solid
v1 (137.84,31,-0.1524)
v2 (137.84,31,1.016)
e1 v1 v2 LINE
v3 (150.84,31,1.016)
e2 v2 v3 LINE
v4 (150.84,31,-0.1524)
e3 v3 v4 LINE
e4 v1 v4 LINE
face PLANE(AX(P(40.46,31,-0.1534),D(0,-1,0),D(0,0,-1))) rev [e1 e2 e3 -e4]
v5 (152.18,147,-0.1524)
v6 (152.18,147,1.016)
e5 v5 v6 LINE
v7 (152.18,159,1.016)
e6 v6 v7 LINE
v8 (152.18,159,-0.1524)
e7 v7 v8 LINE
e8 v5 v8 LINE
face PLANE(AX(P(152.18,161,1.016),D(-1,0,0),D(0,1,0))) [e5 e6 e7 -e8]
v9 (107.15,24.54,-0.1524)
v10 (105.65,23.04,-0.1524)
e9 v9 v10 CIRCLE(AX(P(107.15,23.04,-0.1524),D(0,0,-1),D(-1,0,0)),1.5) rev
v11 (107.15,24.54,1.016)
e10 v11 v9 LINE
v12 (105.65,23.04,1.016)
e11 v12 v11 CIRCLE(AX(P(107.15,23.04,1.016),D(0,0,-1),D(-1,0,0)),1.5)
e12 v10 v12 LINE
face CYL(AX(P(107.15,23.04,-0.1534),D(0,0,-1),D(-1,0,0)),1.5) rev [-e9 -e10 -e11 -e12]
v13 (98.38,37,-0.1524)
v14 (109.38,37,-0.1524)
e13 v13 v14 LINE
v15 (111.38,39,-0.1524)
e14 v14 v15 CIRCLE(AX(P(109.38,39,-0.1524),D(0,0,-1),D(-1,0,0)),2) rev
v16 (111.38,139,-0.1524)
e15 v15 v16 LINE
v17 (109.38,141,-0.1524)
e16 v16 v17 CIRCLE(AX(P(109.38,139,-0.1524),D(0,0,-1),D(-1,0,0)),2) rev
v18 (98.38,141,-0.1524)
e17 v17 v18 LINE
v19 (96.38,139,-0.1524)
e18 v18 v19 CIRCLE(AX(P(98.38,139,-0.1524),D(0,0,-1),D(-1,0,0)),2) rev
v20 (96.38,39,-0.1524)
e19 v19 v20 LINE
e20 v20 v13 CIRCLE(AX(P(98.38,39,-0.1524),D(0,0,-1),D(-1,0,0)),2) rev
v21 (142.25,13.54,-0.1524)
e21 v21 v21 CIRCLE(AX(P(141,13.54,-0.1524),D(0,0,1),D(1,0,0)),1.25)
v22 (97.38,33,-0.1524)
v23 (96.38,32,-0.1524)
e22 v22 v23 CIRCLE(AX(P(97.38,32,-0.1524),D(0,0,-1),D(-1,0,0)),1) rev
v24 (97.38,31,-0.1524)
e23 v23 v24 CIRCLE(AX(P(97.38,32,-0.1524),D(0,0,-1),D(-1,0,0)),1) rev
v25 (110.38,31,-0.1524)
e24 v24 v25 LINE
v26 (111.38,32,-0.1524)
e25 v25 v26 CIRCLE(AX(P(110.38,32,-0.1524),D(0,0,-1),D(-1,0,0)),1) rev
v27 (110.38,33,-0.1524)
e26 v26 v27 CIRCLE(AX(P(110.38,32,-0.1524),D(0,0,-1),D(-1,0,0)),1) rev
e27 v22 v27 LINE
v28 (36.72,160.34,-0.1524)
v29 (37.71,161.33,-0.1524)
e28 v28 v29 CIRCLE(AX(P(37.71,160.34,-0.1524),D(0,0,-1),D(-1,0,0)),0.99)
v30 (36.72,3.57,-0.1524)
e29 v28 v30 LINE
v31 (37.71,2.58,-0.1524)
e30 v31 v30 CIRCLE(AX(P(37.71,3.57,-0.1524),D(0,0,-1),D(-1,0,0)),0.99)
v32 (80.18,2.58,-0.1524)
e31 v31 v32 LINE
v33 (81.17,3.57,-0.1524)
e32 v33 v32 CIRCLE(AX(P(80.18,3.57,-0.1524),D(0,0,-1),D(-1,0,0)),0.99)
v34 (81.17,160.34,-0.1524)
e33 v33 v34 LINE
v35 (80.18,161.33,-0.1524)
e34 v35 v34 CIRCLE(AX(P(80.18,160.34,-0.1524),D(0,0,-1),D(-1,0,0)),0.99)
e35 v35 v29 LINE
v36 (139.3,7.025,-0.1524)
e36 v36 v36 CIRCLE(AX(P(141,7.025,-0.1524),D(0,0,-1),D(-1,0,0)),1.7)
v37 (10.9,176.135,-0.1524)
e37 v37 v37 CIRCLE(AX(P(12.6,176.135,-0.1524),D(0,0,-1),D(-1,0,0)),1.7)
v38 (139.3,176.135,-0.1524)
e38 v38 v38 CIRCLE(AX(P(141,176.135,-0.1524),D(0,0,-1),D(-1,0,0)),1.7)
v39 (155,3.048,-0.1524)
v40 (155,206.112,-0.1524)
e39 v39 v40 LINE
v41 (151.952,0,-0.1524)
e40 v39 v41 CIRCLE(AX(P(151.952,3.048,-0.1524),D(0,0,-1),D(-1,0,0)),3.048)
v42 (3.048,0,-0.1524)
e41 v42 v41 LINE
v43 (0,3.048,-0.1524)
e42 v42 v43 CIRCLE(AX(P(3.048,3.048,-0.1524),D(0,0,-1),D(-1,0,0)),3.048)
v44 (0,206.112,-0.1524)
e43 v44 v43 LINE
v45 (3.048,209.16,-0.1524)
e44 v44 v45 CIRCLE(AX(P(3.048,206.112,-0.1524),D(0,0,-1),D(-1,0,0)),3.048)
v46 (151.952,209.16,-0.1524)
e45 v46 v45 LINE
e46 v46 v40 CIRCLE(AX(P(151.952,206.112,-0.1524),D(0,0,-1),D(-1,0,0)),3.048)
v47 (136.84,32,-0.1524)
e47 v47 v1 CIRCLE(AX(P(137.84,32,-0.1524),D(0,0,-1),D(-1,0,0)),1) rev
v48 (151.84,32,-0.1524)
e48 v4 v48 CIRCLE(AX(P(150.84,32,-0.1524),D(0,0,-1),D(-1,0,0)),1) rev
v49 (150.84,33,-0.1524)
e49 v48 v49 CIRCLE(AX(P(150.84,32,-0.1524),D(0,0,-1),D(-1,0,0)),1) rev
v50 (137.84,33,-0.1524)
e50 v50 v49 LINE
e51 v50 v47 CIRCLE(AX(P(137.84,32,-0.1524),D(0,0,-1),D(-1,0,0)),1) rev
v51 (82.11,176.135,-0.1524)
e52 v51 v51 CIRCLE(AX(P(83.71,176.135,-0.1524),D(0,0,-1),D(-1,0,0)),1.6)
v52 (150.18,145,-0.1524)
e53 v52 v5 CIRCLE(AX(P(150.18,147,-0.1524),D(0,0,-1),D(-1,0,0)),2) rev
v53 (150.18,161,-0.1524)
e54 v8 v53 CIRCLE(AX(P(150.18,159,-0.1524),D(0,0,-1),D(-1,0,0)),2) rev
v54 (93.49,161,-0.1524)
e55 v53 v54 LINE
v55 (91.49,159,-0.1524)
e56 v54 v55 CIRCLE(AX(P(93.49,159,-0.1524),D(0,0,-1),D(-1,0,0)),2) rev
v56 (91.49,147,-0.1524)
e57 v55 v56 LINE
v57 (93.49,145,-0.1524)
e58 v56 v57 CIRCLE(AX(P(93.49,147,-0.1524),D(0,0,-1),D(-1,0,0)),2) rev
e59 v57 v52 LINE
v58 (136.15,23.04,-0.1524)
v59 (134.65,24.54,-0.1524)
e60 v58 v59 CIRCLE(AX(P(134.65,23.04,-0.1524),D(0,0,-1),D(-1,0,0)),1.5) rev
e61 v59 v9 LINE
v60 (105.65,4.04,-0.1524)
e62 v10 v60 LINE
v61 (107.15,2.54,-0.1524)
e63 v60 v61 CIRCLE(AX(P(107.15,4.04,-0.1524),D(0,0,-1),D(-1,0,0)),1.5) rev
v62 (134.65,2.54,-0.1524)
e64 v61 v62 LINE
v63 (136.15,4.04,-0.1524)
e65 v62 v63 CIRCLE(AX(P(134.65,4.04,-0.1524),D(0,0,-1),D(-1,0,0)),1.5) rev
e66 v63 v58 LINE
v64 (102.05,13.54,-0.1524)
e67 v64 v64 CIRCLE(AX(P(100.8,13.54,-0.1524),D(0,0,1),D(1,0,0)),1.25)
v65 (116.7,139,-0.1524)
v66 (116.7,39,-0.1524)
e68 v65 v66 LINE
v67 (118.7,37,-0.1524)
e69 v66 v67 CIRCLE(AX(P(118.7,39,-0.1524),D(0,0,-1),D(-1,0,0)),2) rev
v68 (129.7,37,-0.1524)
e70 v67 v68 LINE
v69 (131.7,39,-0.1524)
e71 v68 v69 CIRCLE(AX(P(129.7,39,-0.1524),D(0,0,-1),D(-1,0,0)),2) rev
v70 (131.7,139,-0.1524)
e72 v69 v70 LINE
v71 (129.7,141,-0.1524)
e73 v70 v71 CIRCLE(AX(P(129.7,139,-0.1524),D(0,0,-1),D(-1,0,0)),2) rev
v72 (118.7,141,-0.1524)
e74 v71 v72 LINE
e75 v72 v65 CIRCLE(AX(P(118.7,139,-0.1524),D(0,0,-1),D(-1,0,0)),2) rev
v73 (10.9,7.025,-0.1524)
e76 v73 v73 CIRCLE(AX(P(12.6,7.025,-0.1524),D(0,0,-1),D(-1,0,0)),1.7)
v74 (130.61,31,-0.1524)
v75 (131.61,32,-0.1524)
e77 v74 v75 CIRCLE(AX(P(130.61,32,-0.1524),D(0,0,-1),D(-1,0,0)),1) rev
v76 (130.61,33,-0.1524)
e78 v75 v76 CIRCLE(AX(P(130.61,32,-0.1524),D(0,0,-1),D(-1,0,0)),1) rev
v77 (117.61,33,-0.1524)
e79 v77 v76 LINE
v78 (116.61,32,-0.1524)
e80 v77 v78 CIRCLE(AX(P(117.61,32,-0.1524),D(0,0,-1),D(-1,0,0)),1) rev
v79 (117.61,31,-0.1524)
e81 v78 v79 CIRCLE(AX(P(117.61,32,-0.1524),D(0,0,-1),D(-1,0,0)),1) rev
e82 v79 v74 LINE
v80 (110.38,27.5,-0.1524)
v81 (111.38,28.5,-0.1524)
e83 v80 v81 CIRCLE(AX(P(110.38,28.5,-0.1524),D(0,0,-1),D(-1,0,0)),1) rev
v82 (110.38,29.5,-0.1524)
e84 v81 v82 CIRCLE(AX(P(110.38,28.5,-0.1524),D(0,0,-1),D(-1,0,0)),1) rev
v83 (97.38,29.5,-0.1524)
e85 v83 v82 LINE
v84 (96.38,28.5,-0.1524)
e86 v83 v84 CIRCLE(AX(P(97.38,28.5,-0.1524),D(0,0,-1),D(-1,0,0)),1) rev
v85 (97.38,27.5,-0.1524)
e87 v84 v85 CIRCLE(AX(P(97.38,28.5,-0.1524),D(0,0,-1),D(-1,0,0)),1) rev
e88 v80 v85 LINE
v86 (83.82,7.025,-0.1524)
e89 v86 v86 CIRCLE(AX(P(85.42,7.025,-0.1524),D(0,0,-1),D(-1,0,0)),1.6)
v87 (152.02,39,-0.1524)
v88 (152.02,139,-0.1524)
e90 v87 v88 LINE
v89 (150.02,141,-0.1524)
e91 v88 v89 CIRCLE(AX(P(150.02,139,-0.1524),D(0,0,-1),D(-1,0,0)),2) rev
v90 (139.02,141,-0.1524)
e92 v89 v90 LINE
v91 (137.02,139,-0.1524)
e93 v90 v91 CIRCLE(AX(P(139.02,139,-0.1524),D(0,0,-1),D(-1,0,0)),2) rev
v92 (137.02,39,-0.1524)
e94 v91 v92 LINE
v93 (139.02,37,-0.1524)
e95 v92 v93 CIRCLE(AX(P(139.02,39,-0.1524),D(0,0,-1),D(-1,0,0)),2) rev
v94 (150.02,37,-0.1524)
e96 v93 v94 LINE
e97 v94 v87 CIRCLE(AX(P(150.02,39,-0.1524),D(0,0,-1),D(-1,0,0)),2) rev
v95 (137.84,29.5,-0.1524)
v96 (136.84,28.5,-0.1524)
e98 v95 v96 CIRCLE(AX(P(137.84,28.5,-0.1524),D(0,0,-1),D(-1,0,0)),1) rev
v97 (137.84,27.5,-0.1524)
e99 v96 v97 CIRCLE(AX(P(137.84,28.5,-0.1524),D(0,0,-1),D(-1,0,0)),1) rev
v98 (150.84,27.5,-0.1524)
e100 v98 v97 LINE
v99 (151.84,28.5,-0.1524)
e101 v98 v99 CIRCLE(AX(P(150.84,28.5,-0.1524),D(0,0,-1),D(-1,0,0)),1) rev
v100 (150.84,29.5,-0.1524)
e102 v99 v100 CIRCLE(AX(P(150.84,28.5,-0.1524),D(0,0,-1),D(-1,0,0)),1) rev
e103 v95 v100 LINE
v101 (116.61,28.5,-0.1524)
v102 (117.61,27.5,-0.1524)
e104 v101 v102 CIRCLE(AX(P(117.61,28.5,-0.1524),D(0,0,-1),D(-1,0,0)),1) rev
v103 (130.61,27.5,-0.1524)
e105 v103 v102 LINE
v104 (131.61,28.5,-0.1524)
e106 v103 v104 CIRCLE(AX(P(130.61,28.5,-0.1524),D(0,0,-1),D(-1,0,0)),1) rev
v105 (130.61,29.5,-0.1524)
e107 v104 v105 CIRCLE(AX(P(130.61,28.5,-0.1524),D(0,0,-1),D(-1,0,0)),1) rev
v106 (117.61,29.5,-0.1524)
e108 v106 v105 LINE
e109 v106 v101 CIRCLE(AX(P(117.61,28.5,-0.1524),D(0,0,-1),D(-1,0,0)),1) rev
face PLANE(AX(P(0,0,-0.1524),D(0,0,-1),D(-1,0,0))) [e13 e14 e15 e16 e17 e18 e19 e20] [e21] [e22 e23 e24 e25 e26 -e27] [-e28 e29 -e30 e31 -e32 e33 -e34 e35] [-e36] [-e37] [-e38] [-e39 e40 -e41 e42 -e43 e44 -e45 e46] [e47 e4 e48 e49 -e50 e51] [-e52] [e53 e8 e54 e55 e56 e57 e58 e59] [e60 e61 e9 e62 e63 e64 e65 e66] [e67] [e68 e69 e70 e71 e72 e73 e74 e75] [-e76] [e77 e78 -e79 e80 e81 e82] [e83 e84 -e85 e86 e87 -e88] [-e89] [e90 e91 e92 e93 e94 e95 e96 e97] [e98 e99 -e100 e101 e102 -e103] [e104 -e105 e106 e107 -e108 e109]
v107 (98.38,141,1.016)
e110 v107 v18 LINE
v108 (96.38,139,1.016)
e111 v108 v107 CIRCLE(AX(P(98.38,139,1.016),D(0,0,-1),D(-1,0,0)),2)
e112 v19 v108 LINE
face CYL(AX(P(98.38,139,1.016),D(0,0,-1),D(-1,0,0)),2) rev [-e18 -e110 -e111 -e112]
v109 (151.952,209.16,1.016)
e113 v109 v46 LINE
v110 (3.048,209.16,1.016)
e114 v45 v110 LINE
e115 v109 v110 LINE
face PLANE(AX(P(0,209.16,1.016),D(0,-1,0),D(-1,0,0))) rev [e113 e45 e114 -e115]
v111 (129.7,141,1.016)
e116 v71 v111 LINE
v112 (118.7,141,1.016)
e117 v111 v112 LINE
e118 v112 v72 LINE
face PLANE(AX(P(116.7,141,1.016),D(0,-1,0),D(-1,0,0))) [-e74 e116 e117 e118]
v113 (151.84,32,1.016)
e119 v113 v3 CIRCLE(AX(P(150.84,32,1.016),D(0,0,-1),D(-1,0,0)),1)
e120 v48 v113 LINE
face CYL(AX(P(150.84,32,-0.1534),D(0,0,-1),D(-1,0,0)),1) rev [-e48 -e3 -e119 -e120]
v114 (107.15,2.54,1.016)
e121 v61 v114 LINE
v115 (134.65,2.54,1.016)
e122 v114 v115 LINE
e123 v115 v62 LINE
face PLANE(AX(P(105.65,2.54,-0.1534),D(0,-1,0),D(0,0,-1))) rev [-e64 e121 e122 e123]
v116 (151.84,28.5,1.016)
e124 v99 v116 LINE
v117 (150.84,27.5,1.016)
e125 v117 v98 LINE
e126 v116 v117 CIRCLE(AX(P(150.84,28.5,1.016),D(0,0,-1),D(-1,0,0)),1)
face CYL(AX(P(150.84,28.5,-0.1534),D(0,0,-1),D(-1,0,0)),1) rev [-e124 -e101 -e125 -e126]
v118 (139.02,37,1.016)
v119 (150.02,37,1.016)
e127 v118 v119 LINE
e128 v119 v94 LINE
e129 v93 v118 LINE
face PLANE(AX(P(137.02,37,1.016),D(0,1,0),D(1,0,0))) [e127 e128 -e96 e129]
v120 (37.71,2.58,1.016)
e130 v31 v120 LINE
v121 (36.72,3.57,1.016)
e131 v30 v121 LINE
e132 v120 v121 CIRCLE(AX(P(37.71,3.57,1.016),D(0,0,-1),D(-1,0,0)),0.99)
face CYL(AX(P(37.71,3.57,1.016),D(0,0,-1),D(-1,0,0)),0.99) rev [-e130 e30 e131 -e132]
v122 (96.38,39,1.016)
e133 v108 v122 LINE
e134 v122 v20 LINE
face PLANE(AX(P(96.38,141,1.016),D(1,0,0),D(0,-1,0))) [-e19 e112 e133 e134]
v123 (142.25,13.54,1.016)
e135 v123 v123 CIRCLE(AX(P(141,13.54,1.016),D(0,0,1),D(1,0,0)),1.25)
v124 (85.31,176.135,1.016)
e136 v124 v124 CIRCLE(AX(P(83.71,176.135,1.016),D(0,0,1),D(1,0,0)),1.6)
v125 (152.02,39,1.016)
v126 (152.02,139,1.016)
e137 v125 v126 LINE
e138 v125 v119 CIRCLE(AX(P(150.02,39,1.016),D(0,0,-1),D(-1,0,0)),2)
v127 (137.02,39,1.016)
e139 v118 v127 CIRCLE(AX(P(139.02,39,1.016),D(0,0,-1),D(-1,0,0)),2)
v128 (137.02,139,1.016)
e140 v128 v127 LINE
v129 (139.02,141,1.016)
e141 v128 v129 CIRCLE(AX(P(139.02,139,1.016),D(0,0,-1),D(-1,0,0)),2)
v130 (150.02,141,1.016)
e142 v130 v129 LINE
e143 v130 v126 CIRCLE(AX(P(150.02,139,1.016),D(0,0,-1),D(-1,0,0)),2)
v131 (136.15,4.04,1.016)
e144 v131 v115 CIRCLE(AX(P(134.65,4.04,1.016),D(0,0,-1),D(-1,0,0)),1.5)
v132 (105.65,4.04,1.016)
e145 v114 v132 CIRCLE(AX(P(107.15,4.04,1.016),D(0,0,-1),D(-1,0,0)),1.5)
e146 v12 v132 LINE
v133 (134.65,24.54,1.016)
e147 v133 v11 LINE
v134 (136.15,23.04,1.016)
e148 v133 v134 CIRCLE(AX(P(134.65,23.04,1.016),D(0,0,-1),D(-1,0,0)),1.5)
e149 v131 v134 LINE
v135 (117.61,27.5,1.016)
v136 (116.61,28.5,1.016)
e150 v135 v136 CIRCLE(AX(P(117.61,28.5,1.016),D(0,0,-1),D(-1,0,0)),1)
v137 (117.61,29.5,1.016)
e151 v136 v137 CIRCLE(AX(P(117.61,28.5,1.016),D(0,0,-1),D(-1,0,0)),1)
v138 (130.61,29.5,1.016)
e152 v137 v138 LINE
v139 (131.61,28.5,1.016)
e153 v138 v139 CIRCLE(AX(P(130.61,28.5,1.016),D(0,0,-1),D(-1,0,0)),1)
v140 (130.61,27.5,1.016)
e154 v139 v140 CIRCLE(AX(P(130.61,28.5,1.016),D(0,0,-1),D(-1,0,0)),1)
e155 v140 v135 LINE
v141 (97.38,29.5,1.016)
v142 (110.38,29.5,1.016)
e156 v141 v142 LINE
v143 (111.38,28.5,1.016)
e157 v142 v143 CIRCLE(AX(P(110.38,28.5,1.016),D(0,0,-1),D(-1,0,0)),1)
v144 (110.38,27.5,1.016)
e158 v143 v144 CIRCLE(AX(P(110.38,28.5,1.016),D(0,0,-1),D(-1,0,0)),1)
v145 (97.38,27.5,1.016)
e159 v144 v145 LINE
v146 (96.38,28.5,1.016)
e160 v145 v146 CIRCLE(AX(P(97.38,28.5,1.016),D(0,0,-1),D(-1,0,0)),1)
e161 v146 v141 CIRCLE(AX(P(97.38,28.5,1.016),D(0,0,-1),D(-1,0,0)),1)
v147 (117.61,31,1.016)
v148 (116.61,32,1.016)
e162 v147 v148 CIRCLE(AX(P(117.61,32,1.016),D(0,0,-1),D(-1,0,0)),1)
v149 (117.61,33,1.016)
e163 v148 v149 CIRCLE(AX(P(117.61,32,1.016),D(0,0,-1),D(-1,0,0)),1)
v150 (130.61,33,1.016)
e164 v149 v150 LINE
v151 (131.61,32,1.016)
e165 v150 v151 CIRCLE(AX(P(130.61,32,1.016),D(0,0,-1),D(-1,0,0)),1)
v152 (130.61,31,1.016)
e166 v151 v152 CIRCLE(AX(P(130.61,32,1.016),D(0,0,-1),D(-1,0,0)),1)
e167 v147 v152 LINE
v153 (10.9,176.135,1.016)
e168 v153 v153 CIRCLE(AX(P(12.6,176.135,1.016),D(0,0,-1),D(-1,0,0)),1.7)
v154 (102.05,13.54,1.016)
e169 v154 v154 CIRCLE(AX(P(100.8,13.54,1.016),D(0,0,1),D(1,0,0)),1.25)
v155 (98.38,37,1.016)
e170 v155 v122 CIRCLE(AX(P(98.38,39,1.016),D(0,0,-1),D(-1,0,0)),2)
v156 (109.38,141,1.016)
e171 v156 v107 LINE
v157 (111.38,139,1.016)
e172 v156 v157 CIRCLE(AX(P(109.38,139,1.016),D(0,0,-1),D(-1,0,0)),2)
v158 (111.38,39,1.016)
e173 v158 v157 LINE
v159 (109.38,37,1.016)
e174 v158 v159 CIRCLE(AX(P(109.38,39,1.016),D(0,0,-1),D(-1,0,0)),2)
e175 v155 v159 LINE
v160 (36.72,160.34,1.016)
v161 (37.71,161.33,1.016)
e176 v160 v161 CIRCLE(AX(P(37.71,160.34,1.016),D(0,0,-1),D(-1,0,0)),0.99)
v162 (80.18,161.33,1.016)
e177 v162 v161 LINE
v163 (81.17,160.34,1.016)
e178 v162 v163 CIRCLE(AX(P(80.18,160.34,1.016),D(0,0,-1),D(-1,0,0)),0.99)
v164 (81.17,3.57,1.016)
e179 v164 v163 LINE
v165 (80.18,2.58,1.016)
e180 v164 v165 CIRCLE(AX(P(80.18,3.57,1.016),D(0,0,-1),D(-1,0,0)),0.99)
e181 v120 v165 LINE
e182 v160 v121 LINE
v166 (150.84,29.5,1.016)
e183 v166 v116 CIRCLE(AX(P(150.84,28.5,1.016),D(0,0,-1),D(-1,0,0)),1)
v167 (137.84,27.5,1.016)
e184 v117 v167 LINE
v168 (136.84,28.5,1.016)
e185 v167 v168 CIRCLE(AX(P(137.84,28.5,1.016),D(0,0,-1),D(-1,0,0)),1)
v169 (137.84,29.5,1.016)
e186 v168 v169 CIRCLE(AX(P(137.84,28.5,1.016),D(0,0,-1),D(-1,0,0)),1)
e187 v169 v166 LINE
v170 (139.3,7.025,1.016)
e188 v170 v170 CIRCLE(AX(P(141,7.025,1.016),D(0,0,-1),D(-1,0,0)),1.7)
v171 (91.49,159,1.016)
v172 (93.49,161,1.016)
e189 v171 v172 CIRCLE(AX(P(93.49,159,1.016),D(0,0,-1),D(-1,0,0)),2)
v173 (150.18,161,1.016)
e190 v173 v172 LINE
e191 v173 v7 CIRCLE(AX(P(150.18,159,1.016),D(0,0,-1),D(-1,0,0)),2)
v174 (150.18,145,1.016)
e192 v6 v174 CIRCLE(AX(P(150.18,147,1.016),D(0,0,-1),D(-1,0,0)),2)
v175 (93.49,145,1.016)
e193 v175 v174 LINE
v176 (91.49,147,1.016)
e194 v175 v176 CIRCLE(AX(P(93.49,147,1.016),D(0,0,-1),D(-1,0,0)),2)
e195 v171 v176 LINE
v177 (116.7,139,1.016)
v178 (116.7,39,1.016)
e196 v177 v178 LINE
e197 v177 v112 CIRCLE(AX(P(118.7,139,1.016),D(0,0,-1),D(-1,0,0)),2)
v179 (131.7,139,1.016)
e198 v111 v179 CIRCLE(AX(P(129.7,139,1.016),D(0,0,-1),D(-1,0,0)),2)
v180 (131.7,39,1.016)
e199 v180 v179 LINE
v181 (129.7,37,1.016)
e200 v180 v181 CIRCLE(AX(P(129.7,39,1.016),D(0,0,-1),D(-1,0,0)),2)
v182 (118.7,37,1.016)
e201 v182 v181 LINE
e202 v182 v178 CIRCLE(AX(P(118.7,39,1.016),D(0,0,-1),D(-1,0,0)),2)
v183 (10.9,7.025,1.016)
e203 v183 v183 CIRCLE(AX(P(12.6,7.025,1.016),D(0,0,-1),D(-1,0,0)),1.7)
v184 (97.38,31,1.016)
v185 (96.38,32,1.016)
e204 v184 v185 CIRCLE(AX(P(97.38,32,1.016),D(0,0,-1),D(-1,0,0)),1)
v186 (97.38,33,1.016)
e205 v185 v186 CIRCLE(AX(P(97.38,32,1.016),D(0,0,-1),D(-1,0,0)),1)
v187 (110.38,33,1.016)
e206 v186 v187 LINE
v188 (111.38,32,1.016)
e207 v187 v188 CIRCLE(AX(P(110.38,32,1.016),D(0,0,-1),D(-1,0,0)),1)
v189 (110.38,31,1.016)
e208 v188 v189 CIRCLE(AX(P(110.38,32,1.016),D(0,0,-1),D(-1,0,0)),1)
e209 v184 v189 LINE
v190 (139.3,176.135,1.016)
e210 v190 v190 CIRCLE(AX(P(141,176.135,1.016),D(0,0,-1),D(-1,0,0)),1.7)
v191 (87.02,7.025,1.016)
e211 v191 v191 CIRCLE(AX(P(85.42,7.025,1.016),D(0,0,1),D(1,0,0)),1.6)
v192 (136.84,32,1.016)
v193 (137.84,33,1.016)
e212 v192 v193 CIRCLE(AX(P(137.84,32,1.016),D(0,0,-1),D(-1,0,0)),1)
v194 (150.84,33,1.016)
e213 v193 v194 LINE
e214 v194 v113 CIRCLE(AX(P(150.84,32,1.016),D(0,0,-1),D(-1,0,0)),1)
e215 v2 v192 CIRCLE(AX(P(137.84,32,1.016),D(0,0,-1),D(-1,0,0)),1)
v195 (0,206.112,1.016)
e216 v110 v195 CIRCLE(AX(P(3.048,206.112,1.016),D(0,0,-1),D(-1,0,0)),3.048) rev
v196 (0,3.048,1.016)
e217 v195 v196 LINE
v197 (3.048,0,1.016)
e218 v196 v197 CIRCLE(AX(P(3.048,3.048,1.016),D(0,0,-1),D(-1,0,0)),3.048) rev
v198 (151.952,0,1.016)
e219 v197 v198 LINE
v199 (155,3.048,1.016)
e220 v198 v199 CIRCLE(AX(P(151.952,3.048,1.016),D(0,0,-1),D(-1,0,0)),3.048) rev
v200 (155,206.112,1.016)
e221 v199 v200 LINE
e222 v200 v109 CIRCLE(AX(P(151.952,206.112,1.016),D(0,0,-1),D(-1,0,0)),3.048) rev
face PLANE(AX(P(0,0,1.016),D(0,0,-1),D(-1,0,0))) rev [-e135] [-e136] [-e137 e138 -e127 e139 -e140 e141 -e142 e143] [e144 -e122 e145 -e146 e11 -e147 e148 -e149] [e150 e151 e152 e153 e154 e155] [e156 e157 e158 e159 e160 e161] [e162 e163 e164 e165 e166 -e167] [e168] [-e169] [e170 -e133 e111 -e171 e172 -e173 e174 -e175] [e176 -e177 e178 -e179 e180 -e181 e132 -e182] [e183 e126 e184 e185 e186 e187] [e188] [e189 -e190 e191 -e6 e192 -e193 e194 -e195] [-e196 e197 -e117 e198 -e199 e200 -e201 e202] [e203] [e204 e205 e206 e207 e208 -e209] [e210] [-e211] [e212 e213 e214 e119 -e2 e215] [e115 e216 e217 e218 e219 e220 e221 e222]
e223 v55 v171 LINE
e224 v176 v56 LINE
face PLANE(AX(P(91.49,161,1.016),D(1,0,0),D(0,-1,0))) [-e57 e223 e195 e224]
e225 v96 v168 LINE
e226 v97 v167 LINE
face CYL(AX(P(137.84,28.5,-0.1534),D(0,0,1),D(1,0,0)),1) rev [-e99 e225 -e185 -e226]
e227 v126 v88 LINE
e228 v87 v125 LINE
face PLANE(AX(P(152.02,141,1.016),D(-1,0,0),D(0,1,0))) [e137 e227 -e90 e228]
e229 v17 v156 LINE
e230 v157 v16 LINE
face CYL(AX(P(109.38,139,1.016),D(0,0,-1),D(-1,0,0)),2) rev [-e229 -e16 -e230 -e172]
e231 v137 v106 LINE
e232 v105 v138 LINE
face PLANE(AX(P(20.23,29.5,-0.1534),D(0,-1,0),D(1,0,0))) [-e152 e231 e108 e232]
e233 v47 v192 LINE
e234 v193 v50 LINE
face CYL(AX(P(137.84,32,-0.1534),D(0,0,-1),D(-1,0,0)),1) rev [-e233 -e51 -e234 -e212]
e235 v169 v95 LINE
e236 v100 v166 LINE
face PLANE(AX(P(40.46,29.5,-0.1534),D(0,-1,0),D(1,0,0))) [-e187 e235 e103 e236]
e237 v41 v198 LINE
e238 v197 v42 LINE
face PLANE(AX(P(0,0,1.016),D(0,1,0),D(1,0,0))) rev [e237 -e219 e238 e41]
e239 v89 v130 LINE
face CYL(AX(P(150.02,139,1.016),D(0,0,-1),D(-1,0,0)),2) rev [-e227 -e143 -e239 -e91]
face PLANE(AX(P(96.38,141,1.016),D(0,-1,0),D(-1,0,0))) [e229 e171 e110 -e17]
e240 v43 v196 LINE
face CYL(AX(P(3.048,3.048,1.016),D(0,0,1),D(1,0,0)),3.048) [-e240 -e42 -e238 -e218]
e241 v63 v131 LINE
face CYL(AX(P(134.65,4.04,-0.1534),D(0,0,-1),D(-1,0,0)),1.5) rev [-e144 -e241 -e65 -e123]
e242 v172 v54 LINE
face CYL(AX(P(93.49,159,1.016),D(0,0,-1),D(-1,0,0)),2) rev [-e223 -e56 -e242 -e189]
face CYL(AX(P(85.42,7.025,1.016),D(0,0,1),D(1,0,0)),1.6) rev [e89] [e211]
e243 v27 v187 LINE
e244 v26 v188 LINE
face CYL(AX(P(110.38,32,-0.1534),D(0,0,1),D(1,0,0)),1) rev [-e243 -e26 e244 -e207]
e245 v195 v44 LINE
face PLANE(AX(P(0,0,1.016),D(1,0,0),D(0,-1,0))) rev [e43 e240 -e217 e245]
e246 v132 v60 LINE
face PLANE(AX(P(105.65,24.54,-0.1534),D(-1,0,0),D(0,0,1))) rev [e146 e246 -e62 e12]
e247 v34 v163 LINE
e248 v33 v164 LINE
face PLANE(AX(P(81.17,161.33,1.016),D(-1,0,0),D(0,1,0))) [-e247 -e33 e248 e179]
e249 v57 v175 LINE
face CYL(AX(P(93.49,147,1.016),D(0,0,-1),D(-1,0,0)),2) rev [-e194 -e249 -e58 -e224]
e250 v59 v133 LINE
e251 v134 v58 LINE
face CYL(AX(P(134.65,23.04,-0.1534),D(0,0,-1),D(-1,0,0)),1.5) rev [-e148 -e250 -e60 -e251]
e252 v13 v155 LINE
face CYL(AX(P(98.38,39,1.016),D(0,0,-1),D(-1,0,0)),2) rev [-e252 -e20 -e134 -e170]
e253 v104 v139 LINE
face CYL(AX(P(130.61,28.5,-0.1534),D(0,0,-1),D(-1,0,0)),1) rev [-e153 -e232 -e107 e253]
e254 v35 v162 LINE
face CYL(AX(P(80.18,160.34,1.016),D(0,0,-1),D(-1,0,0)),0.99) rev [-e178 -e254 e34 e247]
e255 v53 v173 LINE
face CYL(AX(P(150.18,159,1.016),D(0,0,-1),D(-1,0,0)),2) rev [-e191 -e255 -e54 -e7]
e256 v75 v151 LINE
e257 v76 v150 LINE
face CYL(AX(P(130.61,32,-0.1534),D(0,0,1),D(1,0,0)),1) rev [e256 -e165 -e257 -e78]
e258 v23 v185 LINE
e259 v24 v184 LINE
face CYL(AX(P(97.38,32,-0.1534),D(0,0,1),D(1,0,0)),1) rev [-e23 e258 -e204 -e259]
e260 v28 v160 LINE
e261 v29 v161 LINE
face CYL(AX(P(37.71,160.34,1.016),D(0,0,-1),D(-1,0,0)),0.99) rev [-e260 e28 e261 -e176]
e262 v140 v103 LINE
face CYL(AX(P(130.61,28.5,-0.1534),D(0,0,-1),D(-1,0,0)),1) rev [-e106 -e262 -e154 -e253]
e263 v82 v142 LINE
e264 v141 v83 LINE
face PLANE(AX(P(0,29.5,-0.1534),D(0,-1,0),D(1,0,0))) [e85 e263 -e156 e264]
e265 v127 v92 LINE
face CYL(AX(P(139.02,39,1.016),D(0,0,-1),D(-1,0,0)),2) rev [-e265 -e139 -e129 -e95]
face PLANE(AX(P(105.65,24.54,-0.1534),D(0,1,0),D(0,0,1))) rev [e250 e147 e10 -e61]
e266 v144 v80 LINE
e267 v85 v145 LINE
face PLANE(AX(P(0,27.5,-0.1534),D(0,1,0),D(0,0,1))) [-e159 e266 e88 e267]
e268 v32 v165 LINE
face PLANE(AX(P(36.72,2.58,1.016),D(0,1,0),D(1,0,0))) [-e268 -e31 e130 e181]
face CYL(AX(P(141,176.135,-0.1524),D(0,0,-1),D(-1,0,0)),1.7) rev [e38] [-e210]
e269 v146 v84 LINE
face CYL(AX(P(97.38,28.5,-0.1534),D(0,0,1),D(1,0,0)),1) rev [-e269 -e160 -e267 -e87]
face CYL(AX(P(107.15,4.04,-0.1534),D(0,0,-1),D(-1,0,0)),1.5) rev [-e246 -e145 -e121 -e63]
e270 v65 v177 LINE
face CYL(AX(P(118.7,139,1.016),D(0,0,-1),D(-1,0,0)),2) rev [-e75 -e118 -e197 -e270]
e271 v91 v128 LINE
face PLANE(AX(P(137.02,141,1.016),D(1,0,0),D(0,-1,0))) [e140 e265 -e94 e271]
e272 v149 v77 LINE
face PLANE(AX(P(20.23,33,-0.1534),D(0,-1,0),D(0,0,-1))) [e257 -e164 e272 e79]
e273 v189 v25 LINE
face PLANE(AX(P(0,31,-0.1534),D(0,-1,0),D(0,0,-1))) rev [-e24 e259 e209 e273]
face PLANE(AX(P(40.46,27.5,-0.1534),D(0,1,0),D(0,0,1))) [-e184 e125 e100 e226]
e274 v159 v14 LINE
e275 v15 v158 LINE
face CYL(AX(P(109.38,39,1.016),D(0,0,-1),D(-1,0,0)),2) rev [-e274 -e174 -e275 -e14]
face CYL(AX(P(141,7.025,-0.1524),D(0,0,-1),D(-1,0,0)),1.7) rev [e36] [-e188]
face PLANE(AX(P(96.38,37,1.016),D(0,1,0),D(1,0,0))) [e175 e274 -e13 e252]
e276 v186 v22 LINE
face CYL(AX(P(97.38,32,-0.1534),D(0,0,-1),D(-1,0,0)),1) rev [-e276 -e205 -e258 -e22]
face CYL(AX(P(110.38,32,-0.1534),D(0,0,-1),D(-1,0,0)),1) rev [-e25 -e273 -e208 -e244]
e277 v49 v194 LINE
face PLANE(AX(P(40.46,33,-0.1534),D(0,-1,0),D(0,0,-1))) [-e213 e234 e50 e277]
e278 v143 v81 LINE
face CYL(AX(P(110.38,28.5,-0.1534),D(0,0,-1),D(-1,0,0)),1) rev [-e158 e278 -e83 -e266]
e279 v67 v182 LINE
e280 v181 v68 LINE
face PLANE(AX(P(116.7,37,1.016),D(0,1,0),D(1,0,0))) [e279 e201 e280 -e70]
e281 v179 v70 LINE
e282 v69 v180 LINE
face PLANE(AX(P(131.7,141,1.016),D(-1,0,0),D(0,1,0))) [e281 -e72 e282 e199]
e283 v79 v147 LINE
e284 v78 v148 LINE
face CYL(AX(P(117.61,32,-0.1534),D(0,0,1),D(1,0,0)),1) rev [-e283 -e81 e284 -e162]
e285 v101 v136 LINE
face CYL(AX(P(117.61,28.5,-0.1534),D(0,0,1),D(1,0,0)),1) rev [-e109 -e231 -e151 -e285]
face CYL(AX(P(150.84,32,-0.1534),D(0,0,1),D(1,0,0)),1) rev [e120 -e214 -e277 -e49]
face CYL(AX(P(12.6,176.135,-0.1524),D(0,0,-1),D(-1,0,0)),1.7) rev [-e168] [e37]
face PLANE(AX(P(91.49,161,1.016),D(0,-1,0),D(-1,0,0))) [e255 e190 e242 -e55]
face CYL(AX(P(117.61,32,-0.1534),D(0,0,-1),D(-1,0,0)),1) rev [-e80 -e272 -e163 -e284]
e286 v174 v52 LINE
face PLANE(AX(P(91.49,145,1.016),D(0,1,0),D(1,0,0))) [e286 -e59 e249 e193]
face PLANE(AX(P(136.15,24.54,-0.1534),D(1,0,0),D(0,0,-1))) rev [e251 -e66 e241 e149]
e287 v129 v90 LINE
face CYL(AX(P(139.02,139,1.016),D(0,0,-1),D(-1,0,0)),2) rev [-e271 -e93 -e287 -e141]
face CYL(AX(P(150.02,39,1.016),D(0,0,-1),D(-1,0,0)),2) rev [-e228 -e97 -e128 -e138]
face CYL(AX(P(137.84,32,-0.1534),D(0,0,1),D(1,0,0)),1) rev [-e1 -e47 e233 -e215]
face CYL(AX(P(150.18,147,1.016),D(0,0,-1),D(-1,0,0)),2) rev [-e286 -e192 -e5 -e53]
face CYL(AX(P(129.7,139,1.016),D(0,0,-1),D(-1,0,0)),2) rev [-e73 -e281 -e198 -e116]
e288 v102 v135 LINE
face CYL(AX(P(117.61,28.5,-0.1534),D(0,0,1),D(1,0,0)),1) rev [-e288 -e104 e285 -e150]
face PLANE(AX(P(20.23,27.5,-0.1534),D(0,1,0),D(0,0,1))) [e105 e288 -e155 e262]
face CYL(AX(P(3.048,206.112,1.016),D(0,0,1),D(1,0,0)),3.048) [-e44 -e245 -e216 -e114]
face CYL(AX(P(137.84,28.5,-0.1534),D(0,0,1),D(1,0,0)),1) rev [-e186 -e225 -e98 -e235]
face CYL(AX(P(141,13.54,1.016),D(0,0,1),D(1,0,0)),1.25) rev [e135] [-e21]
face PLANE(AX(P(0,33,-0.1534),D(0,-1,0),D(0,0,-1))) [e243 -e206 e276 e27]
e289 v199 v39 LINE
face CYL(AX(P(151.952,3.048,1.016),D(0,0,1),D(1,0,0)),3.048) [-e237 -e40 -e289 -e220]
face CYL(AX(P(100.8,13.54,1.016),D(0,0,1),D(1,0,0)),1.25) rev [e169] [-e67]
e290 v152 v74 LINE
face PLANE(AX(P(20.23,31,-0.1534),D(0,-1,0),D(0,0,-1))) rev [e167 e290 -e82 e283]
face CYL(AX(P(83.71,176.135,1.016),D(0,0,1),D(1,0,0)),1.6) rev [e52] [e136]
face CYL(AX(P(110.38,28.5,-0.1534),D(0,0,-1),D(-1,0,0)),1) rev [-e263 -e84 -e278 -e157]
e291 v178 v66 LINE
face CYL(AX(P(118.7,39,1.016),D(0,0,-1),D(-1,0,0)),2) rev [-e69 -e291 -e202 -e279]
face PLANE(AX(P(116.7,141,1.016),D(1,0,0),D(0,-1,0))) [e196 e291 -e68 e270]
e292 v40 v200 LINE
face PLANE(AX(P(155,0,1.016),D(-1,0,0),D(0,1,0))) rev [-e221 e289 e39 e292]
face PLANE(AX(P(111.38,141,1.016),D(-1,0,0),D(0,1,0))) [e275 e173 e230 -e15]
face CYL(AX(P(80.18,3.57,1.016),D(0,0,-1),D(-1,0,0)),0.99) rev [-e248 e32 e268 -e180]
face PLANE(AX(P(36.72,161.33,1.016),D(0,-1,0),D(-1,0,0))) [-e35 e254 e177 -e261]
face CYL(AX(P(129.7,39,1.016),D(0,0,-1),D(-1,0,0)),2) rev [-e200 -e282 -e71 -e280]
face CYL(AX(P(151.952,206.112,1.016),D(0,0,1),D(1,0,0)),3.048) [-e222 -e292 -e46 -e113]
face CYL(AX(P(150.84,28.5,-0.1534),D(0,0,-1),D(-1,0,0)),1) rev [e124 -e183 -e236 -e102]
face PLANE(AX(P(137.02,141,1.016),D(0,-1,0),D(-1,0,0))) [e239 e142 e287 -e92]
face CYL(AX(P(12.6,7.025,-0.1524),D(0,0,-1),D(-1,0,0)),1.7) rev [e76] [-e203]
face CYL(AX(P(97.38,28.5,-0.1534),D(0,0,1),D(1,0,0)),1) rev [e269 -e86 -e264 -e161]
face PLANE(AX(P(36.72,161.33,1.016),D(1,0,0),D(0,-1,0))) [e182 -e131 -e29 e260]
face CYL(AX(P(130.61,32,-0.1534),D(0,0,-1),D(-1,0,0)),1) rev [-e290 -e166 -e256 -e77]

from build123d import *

# Parameters (mm, degrees)
SKETCH1_W                          = 155
SKETCH1_H                          = 209.16
BACKPLATE_DEPTH                    = 1.016
IO_SHIELD_CUTOUT_REACH             = 262.334
SKETCH2_W                          = 44.45
SKETCH2_H                          = 158.75
FILLET1_R                          = 0.99
EXPANSION_CARD_CUTOUT_REACH        = 262.334
SKETCH5_W                          = 15
SKETCH5_H                          = 104
SKETCH5_W_2                        = 60.69
SKETCH5_H_2                        = 16
CONVERT_SOLID2_START               = -0.1524
CONVERT_SOLID2_OUTLINE_W           = 155
CONVERT_SOLID2_OUTLINE_H           = 209.16
CONVERT_SOLID2_OUTLINE_W_2         = 15
CONVERT_SOLID2_OUTLINE_H_2         = 104
CONVERT_SOLID2_OUTLINE_W_3         = 60.69
CONVERT_SOLID2_OUTLINE_H_3         = 16
CONVERT_SOLID2_DEPTH               = 0.1524
FILLET2_R                          = 3.048
EXPANSION_CARD_TABS_REACH          = 262.335
SKETCH33_W                         = 15
SKETCH33_H                         = 2
LPATTERN1_COUNT                    = 3
LPATTERN1_PITCH                    = 20.23
M3_CLEARANCE_HOLE_FRAME_MOUNTING_D = 3.4
PANEL_MOUNT_CABLE_CUTOUT_REACH     = 262.335
SKETCH42_W                         = 30.5
SKETCH42_H                         = 22
FILLET3_R                          = 1.5
TAP_DRILL_FOR_M3X0_5_TAP1_D        = 2.5
FILLET4_R                          = 2
FILLET5_R                          = 1
SPINE_MOUNTING_HOLES_D             = 3.2
SPINE_MOUNTING_HOLES_DEPTH         = 5
SPINE_MOUNTING_HOLES_TIP           = 0.96137699


# Read off the part's stored shape, not the designer's step: Convert-Solid2
with BuildPart() as part:
    # Sketch1 → backplate (new body)
    with BuildSketch(Plane.XY):
        with Locations((77.5, 104.58)):
            Rectangle(SKETCH1_W, SKETCH1_H)
    extrude(amount=BACKPLATE_DEPTH)

    # Sketch2 → io_shield_cutout (cut, up to next)
    with BuildSketch(Plane.XY.offset(1.016), mode=Mode.PRIVATE) as io_shield_cutout_sk1:
        with Locations((58.945, 81.955)):
            Rectangle(SKETCH2_W, SKETCH2_H)
    io_shield_cutout_tool1 = extrude(io_shield_cutout_sk1.sketch, amount=-IO_SHIELD_CUTOUT_REACH, mode=Mode.PRIVATE) & part.part
    add(io_shield_cutout_tool1.solids().sort_by_distance((58.945, 81.955, 1.016))[0], mode=Mode.SUBTRACT)

    # Fillet1
    fillet1_edges = [part.edges().sort_by_distance(p)[0] for p in [
        (36.72, 2.58, 0.508),
        (36.72, 161.33, 0.508),
        (81.17, 161.33, 0.508),
        (81.17, 2.58, 0.508),
    ]]
    fillet(fillet1_edges, radius=FILLET1_R)

    # Sketch5 → expansion-card-cutout (cut, up to next)
    with BuildSketch(Plane.XY.offset(1.016), mode=Mode.PRIVATE) as expansion_card_cutout_sk1:
        with Locations((103.88, 89)):
            Rectangle(SKETCH5_W, SKETCH5_H)
    expansion_card_cutout_tool1 = extrude(expansion_card_cutout_sk1.sketch, amount=-EXPANSION_CARD_CUTOUT_REACH, mode=Mode.PRIVATE) & part.part
    # Sketch5 → expansion-card-cutout (cut, up to next)
    with BuildSketch(Plane.XY.offset(1.016), mode=Mode.PRIVATE) as expansion_card_cutout_sk2:
        with Locations((121.835, 153)):
            Rectangle(SKETCH5_W_2, SKETCH5_H_2)
    expansion_card_cutout_tool2 = extrude(expansion_card_cutout_sk2.sketch, amount=-EXPANSION_CARD_CUTOUT_REACH, mode=Mode.PRIVATE) & part.part
    # Sketch5 → expansion-card-cutout (cut, up to next)
    with BuildSketch(Plane.XY.offset(1.016), mode=Mode.PRIVATE) as expansion_card_cutout_sk3:
        with Locations((124.2, 89)):
            Rectangle(SKETCH5_W, SKETCH5_H)
    expansion_card_cutout_tool3 = extrude(expansion_card_cutout_sk3.sketch, amount=-EXPANSION_CARD_CUTOUT_REACH, mode=Mode.PRIVATE) & part.part
    # Sketch5 → expansion-card-cutout (cut, up to next)
    with BuildSketch(Plane.XY.offset(1.016), mode=Mode.PRIVATE) as expansion_card_cutout_sk4:
        with Locations((144.52, 89)):
            Rectangle(SKETCH5_W, SKETCH5_H)
    expansion_card_cutout_tool4 = extrude(expansion_card_cutout_sk4.sketch, amount=-EXPANSION_CARD_CUTOUT_REACH, mode=Mode.PRIVATE) & part.part
    add(expansion_card_cutout_tool1.solids().sort_by_distance((103.88, 89, 1.016))[0], mode=Mode.SUBTRACT)
    add(expansion_card_cutout_tool2.solids().sort_by_distance((121.835, 153, 1.016))[0], mode=Mode.SUBTRACT)
    add(expansion_card_cutout_tool3.solids().sort_by_distance((124.2, 89, 1.016))[0], mode=Mode.SUBTRACT)
    add(expansion_card_cutout_tool4.solids().sort_by_distance((144.52, 89, 1.016))[0], mode=Mode.SUBTRACT)

    # Convert-Solid2 outline → Convert-Solid2 (add)
    with BuildSketch(Plane.XY.offset(CONVERT_SOLID2_START)):
        with Locations((77.5, 104.58)):
            Rectangle(CONVERT_SOLID2_OUTLINE_W, CONVERT_SOLID2_OUTLINE_H)
        with BuildLine():
            ThreePointArc((37.71, 2.58), (37.009964287, 2.869964287), (36.72, 3.57))
            Line((36.72, 3.57), (36.72, 160.34))
            ThreePointArc((36.72, 160.34), (37.009964287, 161.040035713), (37.71, 161.33))
            Line((37.71, 161.33), (80.18, 161.33))
            ThreePointArc((80.18, 161.33), (80.880035713, 161.040035713), (81.17, 160.34))
            Line((81.17, 160.34), (81.17, 3.57))
            ThreePointArc((81.17, 3.57), (80.880035713, 2.869964287), (80.18, 2.58))
            Line((80.18, 2.58), (37.71, 2.58))
        make_face(mode=Mode.SUBTRACT)
        with Locations((103.88, 89)):
            Rectangle(CONVERT_SOLID2_OUTLINE_W_2, CONVERT_SOLID2_OUTLINE_H_2, mode=Mode.SUBTRACT)
        with Locations((124.2, 89)):
            Rectangle(CONVERT_SOLID2_OUTLINE_W_2, CONVERT_SOLID2_OUTLINE_H_2, mode=Mode.SUBTRACT)
        with Locations((144.52, 89)):
            Rectangle(CONVERT_SOLID2_OUTLINE_W_2, CONVERT_SOLID2_OUTLINE_H_2, mode=Mode.SUBTRACT)
        with Locations((121.835, 153)):
            Rectangle(CONVERT_SOLID2_OUTLINE_W_3, CONVERT_SOLID2_OUTLINE_H_3, mode=Mode.SUBTRACT)
    extrude(amount=CONVERT_SOLID2_DEPTH)

    # Fillet2
    fillet2_edges = [part.edges().sort_by_distance(p)[0] for p in [
        (0, 0, 0.4318),
        (0, 209.16, 0.4318),
        (155, 209.16, 0.4318),
        (155, 0, 0.4318),
    ]]
    fillet(fillet2_edges, radius=FILLET2_R)

    # Sketch33 → expansion-card-tabs (cut, up to next)
    with BuildSketch(Plane.XY.offset(1.016), mode=Mode.PRIVATE) as expansion_card_tabs_sk1:
        with Locations((103.88, 32)):
            Rectangle(SKETCH33_W, SKETCH33_H)
    expansion_card_tabs_tool1 = extrude(expansion_card_tabs_sk1.sketch, amount=-EXPANSION_CARD_TABS_REACH, mode=Mode.PRIVATE) & part.part
    # Sketch33 → expansion-card-tabs (cut, up to next)
    with BuildSketch(Plane.XY.offset(1.016), mode=Mode.PRIVATE) as expansion_card_tabs_sk2:
        with Locations((103.88, 28.5)):
            Rectangle(SKETCH33_W, SKETCH33_H)
    expansion_card_tabs_tool2 = extrude(expansion_card_tabs_sk2.sketch, amount=-EXPANSION_CARD_TABS_REACH, mode=Mode.PRIVATE) & part.part
    expansion_card_tabs_1 = expansion_card_tabs_tool1.solids().sort_by_distance((103.88, 32, 1.016))[0]
    add(expansion_card_tabs_1, mode=Mode.SUBTRACT)
    expansion_card_tabs_2 = expansion_card_tabs_tool2.solids().sort_by_distance((103.88, 28.5, 1.016))[0]
    add(expansion_card_tabs_2, mode=Mode.SUBTRACT)
    expansion_card_tabs = expansion_card_tabs_1 + expansion_card_tabs_2  # expansion-card-tabs as one shape, for the pattern or mirror that repeats it

    # LPattern1: expansion-card-tabs ×3
    with Locations(*[(i * LPATTERN1_PITCH, 0, 0) for i in range(1, LPATTERN1_COUNT)]):
        add(expansion_card_tabs, mode=Mode.SUBTRACT)

    # M3 Clearance Hole frame mounting (through all)
    with Locations(Plane(origin=(0, 0, -0.1524), x_dir=(-1, 0, 0), z_dir=(0, 0, -1))):
        with Locations((-12.6, 7.025), (-141, 176.135), (-141, 7.025), (-12.6, 176.135)):
            Hole(M3_CLEARANCE_HOLE_FRAME_MOUNTING_D / 2)

    # Sketch42 → panel-mount-cable-cutout (cut, up to next)
    with BuildSketch(Plane.XY.offset(1.016), mode=Mode.PRIVATE) as panel_mount_cable_cutout_sk1:
        with Locations((120.9, 13.54)):
            Rectangle(SKETCH42_W, SKETCH42_H)
    panel_mount_cable_cutout_tool1 = extrude(panel_mount_cable_cutout_sk1.sketch, amount=-PANEL_MOUNT_CABLE_CUTOUT_REACH, mode=Mode.PRIVATE) & part.part
    add(panel_mount_cable_cutout_tool1.solids().sort_by_distance((120.9, 13.54, 1.016))[0], mode=Mode.SUBTRACT)

    # Fillet3
    fillet3_edges = [part.edges().sort_by_distance(p)[0] for p in [
        (105.65, 2.54, 0.4318),
        (105.65, 24.54, 0.4318),
        (136.15, 24.54, 0.4318),
        (136.15, 2.54, 0.4318),
    ]]
    fillet(fillet3_edges, radius=FILLET3_R)

    # Tap Drill for M3x0.5 Tap1 (through all)
    with Locations(Plane(origin=(100.8, 13.54, 1.016), x_dir=(1, 0, 0), z_dir=(0, 0, 1))):
        with Locations((0, 0), (40.2, 0)):
            Hole(TAP_DRILL_FOR_M3X0_5_TAP1_D / 2)

    # Fillet4
    fillet4_edges = [part.edges().sort_by_distance(p)[0] for p in [
        (91.49, 145, 0.4318),
        (152.18, 145, 0.4318),
        (152.18, 161, 0.4318),
        (91.49, 161, 0.4318),
        (137.02, 37, 0.4318),
        (152.02, 37, 0.4318),
        (152.02, 141, 0.4318),
        (137.02, 141, 0.4318),
        (116.7, 37, 0.4318),
        (131.7, 37, 0.4318),
        (131.7, 141, 0.4318),
        (116.7, 141, 0.4318),
        (96.38, 37, 0.4318),
        (111.38, 37, 0.4318),
        (111.38, 141, 0.4318),
        (96.38, 141, 0.4318),
    ]]
    fillet(fillet4_edges, radius=FILLET4_R)

    # Fillet5
    fillet5_edges = [part.edges().sort_by_distance(p)[0] for p in [
        (116.61, 33, 0.4318),
        (116.61, 31, 0.4318),
        (116.61, 27.5, 0.4318),
        (136.84, 33, 0.4318),
        (136.84, 31, 0.4318),
        (136.84, 27.5, 0.4318),
        (116.61, 29.5, 0.4318),
        (136.84, 29.5, 0.4318),
        (131.61, 27.5, 0.4318),
        (131.61, 29.5, 0.4318),
        (131.61, 33, 0.4318),
        (151.84, 33, 0.4318),
        (151.84, 27.5, 0.4318),
        (151.84, 29.5, 0.4318),
        (151.84, 31, 0.4318),
        (131.61, 31, 0.4318),
        (111.38, 31, 0.4318),
        (111.38, 27.5, 0.4318),
        (111.38, 29.5, 0.4318),
        (96.38, 29.5, 0.4318),
        (96.38, 27.5, 0.4318),
        (96.38, 31, 0.4318),
        (96.38, 33, 0.4318),
        (111.38, 33, 0.4318),
    ]]
    fillet(fillet5_edges, radius=FILLET5_R - 0.0001)  # a hair under: the kernel refuses the full size

    # spine-mounting-holes
    with Locations(Plane.XY.offset(1.016)):
        with Locations((83.71, 176.135), (85.42, 7.025)):
            Hole(SPINE_MOUNTING_HOLES_D / 2, depth=SPINE_MOUNTING_HOLES_DEPTH)
            with Locations((0, 0, -(SPINE_MOUNTING_HOLES_DEPTH + SPINE_MOUNTING_HOLES_TIP / 2))):  # 118° drill point
                Cone(0, SPINE_MOUNTING_HOLES_D / 2, SPINE_MOUNTING_HOLES_TIP, mode=Mode.SUBTRACT)


solid = part.part
